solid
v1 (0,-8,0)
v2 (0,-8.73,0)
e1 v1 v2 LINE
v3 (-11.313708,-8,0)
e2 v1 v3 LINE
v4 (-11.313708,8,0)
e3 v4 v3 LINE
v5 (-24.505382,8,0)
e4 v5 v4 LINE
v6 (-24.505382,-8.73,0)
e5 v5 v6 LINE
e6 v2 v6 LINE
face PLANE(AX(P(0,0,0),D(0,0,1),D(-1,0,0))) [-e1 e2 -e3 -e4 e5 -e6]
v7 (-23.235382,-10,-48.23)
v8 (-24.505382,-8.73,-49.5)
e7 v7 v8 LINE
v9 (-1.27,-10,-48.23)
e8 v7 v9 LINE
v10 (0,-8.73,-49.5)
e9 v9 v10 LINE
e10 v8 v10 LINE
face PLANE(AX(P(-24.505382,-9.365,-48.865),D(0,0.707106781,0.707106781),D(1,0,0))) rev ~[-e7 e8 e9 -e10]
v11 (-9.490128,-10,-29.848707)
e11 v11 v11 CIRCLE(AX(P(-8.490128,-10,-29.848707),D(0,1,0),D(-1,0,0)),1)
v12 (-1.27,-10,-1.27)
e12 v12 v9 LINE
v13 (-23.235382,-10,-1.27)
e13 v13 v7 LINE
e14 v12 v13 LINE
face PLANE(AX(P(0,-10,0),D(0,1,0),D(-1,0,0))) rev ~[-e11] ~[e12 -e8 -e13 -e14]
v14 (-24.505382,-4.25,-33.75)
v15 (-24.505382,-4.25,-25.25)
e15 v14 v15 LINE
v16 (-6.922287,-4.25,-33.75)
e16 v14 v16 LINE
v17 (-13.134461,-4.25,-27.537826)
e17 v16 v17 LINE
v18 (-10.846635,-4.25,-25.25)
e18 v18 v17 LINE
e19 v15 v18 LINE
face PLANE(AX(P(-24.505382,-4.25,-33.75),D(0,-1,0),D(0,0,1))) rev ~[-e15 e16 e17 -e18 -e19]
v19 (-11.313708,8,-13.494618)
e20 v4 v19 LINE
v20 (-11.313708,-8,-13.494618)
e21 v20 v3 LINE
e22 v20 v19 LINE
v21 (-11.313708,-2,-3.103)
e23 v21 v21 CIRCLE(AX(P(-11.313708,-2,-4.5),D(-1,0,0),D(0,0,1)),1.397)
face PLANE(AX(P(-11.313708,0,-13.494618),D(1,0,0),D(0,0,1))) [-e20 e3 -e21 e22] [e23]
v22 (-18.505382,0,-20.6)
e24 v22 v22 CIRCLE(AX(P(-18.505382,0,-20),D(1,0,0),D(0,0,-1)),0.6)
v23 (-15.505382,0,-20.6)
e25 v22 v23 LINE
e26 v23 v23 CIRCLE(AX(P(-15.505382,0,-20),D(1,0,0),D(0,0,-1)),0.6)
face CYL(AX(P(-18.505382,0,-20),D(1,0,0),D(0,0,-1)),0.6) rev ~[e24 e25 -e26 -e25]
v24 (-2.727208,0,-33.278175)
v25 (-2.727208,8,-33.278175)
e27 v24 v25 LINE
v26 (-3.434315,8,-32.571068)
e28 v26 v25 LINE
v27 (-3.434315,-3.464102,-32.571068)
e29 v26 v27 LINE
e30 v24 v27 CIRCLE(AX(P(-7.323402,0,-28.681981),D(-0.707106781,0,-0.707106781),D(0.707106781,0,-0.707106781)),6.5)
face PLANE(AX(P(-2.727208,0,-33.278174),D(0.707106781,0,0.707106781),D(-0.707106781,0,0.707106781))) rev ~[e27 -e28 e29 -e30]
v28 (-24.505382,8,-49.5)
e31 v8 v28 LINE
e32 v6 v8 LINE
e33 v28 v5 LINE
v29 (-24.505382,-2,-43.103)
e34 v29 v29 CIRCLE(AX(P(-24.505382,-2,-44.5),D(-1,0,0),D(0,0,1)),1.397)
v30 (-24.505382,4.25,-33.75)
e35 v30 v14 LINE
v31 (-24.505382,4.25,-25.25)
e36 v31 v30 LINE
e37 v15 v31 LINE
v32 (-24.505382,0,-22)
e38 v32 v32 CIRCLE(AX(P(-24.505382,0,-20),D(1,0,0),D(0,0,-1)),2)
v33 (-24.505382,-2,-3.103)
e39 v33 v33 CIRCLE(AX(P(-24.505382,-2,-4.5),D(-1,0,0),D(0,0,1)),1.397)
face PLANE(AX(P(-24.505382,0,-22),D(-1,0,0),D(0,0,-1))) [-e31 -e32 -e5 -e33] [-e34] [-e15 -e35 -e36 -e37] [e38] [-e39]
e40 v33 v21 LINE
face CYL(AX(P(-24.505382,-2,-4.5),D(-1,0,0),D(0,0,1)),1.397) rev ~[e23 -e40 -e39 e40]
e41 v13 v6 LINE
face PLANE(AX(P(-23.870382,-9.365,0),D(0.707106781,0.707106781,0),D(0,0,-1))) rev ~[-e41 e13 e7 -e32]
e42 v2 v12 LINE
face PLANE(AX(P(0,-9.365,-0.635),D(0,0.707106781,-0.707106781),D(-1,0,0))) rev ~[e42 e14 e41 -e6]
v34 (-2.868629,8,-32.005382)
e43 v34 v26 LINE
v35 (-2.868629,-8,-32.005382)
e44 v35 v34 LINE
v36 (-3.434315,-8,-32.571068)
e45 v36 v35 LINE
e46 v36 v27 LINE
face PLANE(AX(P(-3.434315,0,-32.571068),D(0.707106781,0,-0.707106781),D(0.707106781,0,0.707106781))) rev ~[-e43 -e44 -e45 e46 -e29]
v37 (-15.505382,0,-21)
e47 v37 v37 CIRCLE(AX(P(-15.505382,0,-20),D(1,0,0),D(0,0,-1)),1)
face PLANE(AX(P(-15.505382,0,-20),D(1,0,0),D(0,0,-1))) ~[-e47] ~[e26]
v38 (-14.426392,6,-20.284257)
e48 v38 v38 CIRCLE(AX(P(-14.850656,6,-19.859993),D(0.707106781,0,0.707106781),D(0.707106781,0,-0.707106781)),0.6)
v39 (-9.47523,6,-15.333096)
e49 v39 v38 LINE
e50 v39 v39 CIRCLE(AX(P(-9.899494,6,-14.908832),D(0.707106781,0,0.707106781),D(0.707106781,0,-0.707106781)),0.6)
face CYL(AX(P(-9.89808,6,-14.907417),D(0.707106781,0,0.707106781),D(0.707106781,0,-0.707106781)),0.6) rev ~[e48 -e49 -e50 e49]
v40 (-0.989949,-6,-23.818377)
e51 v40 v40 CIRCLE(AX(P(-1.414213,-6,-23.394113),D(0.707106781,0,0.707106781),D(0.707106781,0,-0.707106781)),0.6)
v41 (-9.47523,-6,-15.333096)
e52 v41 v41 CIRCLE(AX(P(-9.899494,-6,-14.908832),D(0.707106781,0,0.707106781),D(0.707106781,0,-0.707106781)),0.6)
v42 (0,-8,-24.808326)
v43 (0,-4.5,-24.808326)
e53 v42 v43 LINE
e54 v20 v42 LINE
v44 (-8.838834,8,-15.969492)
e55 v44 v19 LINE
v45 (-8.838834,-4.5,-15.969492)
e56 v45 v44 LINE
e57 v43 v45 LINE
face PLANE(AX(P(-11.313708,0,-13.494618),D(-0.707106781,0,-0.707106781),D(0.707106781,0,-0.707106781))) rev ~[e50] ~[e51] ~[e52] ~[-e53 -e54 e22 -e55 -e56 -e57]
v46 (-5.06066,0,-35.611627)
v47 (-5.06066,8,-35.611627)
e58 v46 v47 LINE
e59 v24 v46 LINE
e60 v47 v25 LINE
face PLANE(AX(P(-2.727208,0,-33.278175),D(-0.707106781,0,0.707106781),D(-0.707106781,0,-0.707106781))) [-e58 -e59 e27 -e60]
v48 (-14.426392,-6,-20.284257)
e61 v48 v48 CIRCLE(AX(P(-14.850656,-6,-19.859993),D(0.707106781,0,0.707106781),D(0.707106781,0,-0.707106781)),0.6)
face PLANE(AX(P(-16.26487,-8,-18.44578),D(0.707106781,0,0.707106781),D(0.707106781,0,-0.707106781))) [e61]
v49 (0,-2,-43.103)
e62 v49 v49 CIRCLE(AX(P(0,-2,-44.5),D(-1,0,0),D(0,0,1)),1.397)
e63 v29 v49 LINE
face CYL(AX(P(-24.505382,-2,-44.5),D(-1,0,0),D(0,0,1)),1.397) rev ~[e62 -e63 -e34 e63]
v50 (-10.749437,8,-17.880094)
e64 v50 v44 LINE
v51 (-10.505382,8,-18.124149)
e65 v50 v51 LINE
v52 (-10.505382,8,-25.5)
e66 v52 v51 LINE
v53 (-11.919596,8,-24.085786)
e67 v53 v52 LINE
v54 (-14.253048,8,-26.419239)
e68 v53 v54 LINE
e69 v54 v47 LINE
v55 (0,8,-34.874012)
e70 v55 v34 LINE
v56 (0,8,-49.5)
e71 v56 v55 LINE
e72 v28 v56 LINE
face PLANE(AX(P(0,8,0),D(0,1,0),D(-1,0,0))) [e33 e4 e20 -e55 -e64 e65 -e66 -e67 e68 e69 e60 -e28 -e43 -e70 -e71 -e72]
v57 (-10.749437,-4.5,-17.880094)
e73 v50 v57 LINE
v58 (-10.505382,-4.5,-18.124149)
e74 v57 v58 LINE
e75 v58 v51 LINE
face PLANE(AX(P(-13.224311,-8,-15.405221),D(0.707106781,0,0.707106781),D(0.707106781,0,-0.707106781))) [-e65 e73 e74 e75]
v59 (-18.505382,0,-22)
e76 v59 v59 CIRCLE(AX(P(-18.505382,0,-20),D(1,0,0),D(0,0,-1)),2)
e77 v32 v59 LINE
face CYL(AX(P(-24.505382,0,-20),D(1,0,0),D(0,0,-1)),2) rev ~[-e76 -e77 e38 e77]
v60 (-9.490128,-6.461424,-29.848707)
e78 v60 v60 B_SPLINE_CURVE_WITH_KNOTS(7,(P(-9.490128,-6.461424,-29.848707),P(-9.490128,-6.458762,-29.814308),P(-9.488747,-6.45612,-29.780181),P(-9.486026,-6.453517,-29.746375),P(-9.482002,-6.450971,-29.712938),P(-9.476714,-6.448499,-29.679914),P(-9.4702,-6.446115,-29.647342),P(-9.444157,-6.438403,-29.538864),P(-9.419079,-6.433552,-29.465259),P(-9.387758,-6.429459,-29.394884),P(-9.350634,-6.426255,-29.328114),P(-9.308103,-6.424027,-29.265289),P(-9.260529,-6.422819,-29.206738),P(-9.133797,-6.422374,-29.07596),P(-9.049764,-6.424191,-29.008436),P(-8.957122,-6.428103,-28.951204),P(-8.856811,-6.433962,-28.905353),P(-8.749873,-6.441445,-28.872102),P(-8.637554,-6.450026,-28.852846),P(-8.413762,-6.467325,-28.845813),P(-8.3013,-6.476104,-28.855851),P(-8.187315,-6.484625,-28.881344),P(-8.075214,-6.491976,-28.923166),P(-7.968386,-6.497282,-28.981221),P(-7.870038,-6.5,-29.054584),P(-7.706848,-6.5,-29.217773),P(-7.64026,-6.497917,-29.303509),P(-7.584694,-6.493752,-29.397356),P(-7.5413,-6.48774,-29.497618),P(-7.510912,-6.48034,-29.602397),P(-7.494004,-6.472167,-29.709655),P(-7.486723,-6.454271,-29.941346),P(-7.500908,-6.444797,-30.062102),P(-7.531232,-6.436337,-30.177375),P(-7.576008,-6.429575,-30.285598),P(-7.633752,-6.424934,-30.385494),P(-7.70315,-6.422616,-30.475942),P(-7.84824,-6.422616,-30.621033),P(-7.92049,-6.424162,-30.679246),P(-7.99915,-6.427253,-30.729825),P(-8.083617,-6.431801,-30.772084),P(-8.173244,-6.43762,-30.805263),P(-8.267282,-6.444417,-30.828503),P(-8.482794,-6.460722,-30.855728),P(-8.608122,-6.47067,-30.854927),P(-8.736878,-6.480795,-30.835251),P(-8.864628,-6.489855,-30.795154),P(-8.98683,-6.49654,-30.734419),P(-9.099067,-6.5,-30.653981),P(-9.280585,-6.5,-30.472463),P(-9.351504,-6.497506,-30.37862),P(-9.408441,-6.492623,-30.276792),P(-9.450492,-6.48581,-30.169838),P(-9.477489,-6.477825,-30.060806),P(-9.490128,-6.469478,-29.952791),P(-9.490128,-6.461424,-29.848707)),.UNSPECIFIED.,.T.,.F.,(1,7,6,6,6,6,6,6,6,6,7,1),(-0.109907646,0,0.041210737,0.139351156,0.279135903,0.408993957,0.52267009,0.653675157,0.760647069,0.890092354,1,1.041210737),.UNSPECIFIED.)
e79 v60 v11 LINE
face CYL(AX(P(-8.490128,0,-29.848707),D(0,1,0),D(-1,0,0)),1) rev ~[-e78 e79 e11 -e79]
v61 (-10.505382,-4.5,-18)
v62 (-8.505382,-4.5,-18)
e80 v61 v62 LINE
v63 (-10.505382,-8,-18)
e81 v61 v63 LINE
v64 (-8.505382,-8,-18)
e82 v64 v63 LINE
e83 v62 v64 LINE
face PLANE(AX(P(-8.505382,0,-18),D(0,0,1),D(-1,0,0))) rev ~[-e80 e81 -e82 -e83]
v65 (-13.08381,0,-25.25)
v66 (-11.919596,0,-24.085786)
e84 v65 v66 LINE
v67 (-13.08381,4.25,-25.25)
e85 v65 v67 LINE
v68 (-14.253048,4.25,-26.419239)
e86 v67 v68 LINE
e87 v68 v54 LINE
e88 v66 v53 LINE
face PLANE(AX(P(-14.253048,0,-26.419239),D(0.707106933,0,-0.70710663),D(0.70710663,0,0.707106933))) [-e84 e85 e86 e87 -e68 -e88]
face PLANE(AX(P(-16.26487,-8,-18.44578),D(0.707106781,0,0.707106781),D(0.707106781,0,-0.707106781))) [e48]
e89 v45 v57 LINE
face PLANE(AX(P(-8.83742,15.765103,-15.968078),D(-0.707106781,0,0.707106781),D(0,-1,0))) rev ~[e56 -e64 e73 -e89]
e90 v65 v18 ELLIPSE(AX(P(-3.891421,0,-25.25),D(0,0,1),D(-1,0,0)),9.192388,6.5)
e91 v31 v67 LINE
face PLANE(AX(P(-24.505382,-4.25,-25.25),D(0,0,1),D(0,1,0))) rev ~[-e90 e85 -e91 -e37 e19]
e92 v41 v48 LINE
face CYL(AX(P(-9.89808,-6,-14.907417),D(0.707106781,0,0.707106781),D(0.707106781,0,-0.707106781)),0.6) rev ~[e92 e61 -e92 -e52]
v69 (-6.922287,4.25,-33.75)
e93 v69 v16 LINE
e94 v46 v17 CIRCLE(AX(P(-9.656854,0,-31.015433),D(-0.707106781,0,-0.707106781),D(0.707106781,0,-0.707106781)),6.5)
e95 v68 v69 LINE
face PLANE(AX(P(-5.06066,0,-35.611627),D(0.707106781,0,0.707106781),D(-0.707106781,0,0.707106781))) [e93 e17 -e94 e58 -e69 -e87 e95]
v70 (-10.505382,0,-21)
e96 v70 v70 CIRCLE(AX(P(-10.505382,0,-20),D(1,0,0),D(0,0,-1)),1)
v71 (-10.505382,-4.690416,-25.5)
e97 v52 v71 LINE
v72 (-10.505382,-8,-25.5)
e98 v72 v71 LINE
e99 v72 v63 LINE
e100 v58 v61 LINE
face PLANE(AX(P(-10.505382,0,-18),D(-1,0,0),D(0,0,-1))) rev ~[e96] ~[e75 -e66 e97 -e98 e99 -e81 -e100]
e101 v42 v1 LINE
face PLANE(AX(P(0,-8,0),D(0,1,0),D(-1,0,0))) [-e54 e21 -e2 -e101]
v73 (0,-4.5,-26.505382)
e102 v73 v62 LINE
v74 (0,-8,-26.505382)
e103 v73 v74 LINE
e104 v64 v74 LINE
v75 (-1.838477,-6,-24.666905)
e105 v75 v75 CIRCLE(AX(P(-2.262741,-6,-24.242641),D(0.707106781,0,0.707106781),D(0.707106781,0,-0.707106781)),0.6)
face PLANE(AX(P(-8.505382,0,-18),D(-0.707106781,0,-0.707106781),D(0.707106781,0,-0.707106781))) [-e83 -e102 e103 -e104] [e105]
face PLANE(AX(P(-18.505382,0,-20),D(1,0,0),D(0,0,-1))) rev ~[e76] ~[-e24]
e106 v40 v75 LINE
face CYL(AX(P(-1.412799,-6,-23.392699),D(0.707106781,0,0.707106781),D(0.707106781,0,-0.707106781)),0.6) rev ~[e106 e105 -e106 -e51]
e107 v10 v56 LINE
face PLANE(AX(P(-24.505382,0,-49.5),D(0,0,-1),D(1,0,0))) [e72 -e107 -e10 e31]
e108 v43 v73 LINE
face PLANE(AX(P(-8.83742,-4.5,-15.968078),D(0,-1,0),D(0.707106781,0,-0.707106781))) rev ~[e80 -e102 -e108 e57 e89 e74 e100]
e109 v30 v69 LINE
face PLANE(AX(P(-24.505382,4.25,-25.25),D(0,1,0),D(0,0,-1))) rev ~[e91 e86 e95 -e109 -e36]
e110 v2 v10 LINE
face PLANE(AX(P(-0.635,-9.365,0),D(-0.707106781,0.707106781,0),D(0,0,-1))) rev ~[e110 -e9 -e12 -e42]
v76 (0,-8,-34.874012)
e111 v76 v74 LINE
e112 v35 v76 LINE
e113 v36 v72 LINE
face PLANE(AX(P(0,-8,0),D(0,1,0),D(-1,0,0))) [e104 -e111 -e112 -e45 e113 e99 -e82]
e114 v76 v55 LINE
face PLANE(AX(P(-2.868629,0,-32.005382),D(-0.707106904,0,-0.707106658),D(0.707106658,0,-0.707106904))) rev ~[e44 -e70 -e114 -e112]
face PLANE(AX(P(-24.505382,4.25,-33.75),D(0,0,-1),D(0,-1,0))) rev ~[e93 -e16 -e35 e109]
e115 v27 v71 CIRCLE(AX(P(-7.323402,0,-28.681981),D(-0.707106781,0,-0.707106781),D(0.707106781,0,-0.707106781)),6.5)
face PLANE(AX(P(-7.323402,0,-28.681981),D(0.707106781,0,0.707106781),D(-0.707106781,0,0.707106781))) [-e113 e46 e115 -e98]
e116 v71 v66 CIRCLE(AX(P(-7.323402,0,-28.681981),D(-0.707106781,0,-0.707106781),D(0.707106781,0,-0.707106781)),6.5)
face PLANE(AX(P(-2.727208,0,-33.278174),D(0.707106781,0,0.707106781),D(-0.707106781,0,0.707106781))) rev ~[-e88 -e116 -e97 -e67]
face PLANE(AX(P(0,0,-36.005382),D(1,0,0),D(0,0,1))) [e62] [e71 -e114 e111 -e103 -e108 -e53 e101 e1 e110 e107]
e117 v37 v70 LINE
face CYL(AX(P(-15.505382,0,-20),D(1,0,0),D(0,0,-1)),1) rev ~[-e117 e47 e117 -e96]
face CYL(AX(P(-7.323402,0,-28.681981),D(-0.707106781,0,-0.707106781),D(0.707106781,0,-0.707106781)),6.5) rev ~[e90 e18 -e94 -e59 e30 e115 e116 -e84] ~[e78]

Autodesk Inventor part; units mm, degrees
ref_plane "YZ Plane" through (0, 0, 0) normal (1, 0, 0) x (0, 1, 0)
ref_plane "XZ Plane" through (0, 0, 0) normal (0, 1, 0) x (-1, 0, 0)
ref_plane "XY Plane" through (0, 0, 0) normal (0, 0, 1) x (1, 0, 0)
sketch "Sketch1" plane through (0, 0, 0) normal (0, 1, 0) x (-1, 0, 0)
  line L0 (24.505382, -20) -> (6.505382, -20) construction
  line L1 (6.505382, -20) -> (6.505382, -29.5) construction
  line L2 (6.505382, -29.5) -> (24.505382, -29.5) construction
  line L3 (0, -36.005382) -> (10.505382, -25.5)
  line L4 (11.313708, -13.494618) -> (0, -24.808326)
  line L5 (8.505382, -18) -> (0, -26.505382)
  line L6 (8.505382, -18) -> (10.505382, -18)
  line L7 (0, 0) -> (24.505382, 0)
  line L8 (24.505382, 0) -> (24.505382, -49.5)
  line L9 (24.505382, -49.5) -> (0, -49.5)
  line L10 (0, -49.5) -> (0, 0)
  line L11 (6.505382, -20) -> (5.656854, -19.151472) construction
  line L12 (10.505382, -18) -> (10.505382, -25.5)
  line L13 (11.313708, -13.494618) -> (11.313708, 0)
  line L14 (2.727208, -33.278175) -> (5.06066, -35.611627)
  line L15 (5.06066, -35.611627) -> (14.253048, -26.419239)
  line L16 (14.253048, -26.419239) -> (11.919596, -24.085786)
  line L17 (7.323402, -28.681981) -> (9.656854, -31.015433)
  line L18 (10.505382, -25.5) -> (11.919596, -24.085786)
  line L19 (3.434315, -32.571068) -> (2.868629, -32.005382)
  line L20 (2.868629, -32.005382) -> (0, -34.874012)
  circle A0 centre (8.490128, -29.848707) radius 1
  line L21 (24.505382, -20) -> (10.505382, -20)
  line L22 (24.505382, -22) -> (18.505382, -22)
  line L23 (18.505382, -22) -> (18.505382, -20.6)
  line L24 (18.505382, -20.6) -> (15.505382, -20.6)
  line L25 (15.505382, -20.6) -> (15.505382, -21)
  line L26 (15.505382, -21) -> (10.505382, -21)
  dimension "d0" = 45
  dimension "d1" = 45
  dimension "d2" = 1.2
  dimension "d3" = 2
  dimension "d4" = 14
  dimension "d5" = 8
  dimension "d6" = 8
  dimension "d9" = 20
  dimension "d10" = 20
  dimension "d11" = 9.5
  dimension "d12" = 3.3
  dimension "d13" = 13
  dimension "d14" = 2
  dimension "d46" = 2
  dimension "d49" = 0.8
  dimension "d50" = 1
  dimension "d51" = 2
  dimension "d52" = 1
  dimension "d53" = 0.6
  dimension "d54" = 5
  dimension "d55" = 6
  dimension "d56" = 2
extrude "Extrusion1" add sketch "Sketch1" along normal blind 8 and the other way blind 10 contours L10 L20 L19 L3 | L3 L14 L15 L16 L18 L12 L26 L25 L24 L23 L22 L8 L9 L10 | L3 L17 A0 L15 L14 | L10 L5 L6 L12 L3 L19 L20 | L10 L4 L13 L7 L8 L21 L12 L6 L5 | L3 L18 L16 L15 L17 A0 | L22 L23 L24 L25 L26 L12 L21 L8 | L10 L7 L13 L4
extrude "Extrusion2" cut sketch "Sketch1" along normal blind 13 and the other way blind 8 contours L10 L5 L6 L12 L3 L19 L20 | L10 L7 L13 L4
revolve "Revolution2" cut sketch "Sketch1" angle 360 about axis through (-24.505382, 0, -20) along (1, 0, 0) contours L22 L23 L24 L25 L26 L12 L21 L8
extrude "Extrusion3" cut sketch "Sketch1" along normal blind 13 contours L3 L17 A0 L15 L14 | L3 L18 L16 L15 L17 A0 | A0 L17 | L17 A0
revolve "Revolution1" cut sketch "Sketch1" angle 360 about axis through (-7.323402, 0, -28.681981) along (-0.7071068, 0, -0.7071068) picked at (8.589296, -30.166947) contours L3 L17 A0 L15 L14 | L17 A0
sketch "Sketch2" plane through (-24.505382, -10, 0) normal (-1, 0, 0) x (0, 0, 1)
  line L0 (-33.75, 5.75) -> (-25.25, 5.75)
  line L1 (-25.25, 5.75) -> (-25.25, 14.25)
  line L2 (-25.25, 14.25) -> (-33.75, 14.25)
  line L3 (-33.75, 14.25) -> (-33.75, 5.75)
  circle A0 centre (-20, 10) radius 1
  circle A1 centre (-20, 10) radius 2
  circle A2 centre (-44.5, 8) radius 1.397
  circle A3 centre (-4.5, 8) radius 1.397
  point P0 (0, 10)
  point P1 (-20, 10)
  point P2 (-20, 10)
  point P3 (-20, 10)
  point P4 (-29.5, 10)
  point P5 (-29.5, 10)
  point P6 (-29.5, 10)
  point P7 (-33.75, 10)
  point P8 (-29.5, 14.25)
  dimension "d24" = 8.5
  dimension "d25" = 15.5
  dimension "d26" = 2
  dimension "d27" = 2.794
  dimension "d28" = 15
  dimension "d29" = 4
  dimension "d30" = 2
extrude "Extrusion4" cut sketch "Sketch2" against normal up to next contours L3 L2 L1 L0 | A2 | A3
sketch "Sketch3" plane through (-11.313708, -8, -13.494618) normal (0.7071068, 0, 0.7071068) x (0.7071068, 0, -0.7071068)
  line L0 (2, 2) -> (14, 2) construction
  line L1 (14, 2) -> (14, 14) construction
  line L2 (14, 14) -> (2, 14) construction
  line L3 (2, 14) -> (2, 2) construction
  line L4 (3.5, 3.5) -> (19.455942, 3.5)
  line L5 (19.455942, 3.5) -> (19.455942, 23.765103)
  line L6 (19.455942, 23.765103) -> (3.5, 23.765103)
  line L7 (3.5, 23.765103) -> (3.5, 3.5)
  circle A0 centre (2, 2) radius 0.6
  circle A1 centre (2, 14) radius 0.6
  circle A2 centre (14, 2) radius 0.6
  point P0 (-1.542136, 8)
  point P1 (8, 8)
  point P2 (8, 8)
  point P3 (8, 8)
  point P4 (14, 8)
  point P5 (8, 14)
  dimension "d35" = 4.5
  dimension "d36" = 4.5
  dimension "d37" = 12
  dimension "d38" = 1.2
extrude "Extrusion6" cut sketch "Sketch3" against normal blind 2.7 contours L7 L6 L5 L4
extrude "Extrusion7" cut sketch "Sketch3" against normal blind 7 contours A0 | A1 | A2
chamfer "Chamfer1" distance 1.27 angle 45 4 edges at (-12.2527, -10, -49.5) (0, -10, -24.75) (-24.5054, -10, -24.75) (-12.2527, -10, 0)
properties part number "minimal micro scanner 2"
